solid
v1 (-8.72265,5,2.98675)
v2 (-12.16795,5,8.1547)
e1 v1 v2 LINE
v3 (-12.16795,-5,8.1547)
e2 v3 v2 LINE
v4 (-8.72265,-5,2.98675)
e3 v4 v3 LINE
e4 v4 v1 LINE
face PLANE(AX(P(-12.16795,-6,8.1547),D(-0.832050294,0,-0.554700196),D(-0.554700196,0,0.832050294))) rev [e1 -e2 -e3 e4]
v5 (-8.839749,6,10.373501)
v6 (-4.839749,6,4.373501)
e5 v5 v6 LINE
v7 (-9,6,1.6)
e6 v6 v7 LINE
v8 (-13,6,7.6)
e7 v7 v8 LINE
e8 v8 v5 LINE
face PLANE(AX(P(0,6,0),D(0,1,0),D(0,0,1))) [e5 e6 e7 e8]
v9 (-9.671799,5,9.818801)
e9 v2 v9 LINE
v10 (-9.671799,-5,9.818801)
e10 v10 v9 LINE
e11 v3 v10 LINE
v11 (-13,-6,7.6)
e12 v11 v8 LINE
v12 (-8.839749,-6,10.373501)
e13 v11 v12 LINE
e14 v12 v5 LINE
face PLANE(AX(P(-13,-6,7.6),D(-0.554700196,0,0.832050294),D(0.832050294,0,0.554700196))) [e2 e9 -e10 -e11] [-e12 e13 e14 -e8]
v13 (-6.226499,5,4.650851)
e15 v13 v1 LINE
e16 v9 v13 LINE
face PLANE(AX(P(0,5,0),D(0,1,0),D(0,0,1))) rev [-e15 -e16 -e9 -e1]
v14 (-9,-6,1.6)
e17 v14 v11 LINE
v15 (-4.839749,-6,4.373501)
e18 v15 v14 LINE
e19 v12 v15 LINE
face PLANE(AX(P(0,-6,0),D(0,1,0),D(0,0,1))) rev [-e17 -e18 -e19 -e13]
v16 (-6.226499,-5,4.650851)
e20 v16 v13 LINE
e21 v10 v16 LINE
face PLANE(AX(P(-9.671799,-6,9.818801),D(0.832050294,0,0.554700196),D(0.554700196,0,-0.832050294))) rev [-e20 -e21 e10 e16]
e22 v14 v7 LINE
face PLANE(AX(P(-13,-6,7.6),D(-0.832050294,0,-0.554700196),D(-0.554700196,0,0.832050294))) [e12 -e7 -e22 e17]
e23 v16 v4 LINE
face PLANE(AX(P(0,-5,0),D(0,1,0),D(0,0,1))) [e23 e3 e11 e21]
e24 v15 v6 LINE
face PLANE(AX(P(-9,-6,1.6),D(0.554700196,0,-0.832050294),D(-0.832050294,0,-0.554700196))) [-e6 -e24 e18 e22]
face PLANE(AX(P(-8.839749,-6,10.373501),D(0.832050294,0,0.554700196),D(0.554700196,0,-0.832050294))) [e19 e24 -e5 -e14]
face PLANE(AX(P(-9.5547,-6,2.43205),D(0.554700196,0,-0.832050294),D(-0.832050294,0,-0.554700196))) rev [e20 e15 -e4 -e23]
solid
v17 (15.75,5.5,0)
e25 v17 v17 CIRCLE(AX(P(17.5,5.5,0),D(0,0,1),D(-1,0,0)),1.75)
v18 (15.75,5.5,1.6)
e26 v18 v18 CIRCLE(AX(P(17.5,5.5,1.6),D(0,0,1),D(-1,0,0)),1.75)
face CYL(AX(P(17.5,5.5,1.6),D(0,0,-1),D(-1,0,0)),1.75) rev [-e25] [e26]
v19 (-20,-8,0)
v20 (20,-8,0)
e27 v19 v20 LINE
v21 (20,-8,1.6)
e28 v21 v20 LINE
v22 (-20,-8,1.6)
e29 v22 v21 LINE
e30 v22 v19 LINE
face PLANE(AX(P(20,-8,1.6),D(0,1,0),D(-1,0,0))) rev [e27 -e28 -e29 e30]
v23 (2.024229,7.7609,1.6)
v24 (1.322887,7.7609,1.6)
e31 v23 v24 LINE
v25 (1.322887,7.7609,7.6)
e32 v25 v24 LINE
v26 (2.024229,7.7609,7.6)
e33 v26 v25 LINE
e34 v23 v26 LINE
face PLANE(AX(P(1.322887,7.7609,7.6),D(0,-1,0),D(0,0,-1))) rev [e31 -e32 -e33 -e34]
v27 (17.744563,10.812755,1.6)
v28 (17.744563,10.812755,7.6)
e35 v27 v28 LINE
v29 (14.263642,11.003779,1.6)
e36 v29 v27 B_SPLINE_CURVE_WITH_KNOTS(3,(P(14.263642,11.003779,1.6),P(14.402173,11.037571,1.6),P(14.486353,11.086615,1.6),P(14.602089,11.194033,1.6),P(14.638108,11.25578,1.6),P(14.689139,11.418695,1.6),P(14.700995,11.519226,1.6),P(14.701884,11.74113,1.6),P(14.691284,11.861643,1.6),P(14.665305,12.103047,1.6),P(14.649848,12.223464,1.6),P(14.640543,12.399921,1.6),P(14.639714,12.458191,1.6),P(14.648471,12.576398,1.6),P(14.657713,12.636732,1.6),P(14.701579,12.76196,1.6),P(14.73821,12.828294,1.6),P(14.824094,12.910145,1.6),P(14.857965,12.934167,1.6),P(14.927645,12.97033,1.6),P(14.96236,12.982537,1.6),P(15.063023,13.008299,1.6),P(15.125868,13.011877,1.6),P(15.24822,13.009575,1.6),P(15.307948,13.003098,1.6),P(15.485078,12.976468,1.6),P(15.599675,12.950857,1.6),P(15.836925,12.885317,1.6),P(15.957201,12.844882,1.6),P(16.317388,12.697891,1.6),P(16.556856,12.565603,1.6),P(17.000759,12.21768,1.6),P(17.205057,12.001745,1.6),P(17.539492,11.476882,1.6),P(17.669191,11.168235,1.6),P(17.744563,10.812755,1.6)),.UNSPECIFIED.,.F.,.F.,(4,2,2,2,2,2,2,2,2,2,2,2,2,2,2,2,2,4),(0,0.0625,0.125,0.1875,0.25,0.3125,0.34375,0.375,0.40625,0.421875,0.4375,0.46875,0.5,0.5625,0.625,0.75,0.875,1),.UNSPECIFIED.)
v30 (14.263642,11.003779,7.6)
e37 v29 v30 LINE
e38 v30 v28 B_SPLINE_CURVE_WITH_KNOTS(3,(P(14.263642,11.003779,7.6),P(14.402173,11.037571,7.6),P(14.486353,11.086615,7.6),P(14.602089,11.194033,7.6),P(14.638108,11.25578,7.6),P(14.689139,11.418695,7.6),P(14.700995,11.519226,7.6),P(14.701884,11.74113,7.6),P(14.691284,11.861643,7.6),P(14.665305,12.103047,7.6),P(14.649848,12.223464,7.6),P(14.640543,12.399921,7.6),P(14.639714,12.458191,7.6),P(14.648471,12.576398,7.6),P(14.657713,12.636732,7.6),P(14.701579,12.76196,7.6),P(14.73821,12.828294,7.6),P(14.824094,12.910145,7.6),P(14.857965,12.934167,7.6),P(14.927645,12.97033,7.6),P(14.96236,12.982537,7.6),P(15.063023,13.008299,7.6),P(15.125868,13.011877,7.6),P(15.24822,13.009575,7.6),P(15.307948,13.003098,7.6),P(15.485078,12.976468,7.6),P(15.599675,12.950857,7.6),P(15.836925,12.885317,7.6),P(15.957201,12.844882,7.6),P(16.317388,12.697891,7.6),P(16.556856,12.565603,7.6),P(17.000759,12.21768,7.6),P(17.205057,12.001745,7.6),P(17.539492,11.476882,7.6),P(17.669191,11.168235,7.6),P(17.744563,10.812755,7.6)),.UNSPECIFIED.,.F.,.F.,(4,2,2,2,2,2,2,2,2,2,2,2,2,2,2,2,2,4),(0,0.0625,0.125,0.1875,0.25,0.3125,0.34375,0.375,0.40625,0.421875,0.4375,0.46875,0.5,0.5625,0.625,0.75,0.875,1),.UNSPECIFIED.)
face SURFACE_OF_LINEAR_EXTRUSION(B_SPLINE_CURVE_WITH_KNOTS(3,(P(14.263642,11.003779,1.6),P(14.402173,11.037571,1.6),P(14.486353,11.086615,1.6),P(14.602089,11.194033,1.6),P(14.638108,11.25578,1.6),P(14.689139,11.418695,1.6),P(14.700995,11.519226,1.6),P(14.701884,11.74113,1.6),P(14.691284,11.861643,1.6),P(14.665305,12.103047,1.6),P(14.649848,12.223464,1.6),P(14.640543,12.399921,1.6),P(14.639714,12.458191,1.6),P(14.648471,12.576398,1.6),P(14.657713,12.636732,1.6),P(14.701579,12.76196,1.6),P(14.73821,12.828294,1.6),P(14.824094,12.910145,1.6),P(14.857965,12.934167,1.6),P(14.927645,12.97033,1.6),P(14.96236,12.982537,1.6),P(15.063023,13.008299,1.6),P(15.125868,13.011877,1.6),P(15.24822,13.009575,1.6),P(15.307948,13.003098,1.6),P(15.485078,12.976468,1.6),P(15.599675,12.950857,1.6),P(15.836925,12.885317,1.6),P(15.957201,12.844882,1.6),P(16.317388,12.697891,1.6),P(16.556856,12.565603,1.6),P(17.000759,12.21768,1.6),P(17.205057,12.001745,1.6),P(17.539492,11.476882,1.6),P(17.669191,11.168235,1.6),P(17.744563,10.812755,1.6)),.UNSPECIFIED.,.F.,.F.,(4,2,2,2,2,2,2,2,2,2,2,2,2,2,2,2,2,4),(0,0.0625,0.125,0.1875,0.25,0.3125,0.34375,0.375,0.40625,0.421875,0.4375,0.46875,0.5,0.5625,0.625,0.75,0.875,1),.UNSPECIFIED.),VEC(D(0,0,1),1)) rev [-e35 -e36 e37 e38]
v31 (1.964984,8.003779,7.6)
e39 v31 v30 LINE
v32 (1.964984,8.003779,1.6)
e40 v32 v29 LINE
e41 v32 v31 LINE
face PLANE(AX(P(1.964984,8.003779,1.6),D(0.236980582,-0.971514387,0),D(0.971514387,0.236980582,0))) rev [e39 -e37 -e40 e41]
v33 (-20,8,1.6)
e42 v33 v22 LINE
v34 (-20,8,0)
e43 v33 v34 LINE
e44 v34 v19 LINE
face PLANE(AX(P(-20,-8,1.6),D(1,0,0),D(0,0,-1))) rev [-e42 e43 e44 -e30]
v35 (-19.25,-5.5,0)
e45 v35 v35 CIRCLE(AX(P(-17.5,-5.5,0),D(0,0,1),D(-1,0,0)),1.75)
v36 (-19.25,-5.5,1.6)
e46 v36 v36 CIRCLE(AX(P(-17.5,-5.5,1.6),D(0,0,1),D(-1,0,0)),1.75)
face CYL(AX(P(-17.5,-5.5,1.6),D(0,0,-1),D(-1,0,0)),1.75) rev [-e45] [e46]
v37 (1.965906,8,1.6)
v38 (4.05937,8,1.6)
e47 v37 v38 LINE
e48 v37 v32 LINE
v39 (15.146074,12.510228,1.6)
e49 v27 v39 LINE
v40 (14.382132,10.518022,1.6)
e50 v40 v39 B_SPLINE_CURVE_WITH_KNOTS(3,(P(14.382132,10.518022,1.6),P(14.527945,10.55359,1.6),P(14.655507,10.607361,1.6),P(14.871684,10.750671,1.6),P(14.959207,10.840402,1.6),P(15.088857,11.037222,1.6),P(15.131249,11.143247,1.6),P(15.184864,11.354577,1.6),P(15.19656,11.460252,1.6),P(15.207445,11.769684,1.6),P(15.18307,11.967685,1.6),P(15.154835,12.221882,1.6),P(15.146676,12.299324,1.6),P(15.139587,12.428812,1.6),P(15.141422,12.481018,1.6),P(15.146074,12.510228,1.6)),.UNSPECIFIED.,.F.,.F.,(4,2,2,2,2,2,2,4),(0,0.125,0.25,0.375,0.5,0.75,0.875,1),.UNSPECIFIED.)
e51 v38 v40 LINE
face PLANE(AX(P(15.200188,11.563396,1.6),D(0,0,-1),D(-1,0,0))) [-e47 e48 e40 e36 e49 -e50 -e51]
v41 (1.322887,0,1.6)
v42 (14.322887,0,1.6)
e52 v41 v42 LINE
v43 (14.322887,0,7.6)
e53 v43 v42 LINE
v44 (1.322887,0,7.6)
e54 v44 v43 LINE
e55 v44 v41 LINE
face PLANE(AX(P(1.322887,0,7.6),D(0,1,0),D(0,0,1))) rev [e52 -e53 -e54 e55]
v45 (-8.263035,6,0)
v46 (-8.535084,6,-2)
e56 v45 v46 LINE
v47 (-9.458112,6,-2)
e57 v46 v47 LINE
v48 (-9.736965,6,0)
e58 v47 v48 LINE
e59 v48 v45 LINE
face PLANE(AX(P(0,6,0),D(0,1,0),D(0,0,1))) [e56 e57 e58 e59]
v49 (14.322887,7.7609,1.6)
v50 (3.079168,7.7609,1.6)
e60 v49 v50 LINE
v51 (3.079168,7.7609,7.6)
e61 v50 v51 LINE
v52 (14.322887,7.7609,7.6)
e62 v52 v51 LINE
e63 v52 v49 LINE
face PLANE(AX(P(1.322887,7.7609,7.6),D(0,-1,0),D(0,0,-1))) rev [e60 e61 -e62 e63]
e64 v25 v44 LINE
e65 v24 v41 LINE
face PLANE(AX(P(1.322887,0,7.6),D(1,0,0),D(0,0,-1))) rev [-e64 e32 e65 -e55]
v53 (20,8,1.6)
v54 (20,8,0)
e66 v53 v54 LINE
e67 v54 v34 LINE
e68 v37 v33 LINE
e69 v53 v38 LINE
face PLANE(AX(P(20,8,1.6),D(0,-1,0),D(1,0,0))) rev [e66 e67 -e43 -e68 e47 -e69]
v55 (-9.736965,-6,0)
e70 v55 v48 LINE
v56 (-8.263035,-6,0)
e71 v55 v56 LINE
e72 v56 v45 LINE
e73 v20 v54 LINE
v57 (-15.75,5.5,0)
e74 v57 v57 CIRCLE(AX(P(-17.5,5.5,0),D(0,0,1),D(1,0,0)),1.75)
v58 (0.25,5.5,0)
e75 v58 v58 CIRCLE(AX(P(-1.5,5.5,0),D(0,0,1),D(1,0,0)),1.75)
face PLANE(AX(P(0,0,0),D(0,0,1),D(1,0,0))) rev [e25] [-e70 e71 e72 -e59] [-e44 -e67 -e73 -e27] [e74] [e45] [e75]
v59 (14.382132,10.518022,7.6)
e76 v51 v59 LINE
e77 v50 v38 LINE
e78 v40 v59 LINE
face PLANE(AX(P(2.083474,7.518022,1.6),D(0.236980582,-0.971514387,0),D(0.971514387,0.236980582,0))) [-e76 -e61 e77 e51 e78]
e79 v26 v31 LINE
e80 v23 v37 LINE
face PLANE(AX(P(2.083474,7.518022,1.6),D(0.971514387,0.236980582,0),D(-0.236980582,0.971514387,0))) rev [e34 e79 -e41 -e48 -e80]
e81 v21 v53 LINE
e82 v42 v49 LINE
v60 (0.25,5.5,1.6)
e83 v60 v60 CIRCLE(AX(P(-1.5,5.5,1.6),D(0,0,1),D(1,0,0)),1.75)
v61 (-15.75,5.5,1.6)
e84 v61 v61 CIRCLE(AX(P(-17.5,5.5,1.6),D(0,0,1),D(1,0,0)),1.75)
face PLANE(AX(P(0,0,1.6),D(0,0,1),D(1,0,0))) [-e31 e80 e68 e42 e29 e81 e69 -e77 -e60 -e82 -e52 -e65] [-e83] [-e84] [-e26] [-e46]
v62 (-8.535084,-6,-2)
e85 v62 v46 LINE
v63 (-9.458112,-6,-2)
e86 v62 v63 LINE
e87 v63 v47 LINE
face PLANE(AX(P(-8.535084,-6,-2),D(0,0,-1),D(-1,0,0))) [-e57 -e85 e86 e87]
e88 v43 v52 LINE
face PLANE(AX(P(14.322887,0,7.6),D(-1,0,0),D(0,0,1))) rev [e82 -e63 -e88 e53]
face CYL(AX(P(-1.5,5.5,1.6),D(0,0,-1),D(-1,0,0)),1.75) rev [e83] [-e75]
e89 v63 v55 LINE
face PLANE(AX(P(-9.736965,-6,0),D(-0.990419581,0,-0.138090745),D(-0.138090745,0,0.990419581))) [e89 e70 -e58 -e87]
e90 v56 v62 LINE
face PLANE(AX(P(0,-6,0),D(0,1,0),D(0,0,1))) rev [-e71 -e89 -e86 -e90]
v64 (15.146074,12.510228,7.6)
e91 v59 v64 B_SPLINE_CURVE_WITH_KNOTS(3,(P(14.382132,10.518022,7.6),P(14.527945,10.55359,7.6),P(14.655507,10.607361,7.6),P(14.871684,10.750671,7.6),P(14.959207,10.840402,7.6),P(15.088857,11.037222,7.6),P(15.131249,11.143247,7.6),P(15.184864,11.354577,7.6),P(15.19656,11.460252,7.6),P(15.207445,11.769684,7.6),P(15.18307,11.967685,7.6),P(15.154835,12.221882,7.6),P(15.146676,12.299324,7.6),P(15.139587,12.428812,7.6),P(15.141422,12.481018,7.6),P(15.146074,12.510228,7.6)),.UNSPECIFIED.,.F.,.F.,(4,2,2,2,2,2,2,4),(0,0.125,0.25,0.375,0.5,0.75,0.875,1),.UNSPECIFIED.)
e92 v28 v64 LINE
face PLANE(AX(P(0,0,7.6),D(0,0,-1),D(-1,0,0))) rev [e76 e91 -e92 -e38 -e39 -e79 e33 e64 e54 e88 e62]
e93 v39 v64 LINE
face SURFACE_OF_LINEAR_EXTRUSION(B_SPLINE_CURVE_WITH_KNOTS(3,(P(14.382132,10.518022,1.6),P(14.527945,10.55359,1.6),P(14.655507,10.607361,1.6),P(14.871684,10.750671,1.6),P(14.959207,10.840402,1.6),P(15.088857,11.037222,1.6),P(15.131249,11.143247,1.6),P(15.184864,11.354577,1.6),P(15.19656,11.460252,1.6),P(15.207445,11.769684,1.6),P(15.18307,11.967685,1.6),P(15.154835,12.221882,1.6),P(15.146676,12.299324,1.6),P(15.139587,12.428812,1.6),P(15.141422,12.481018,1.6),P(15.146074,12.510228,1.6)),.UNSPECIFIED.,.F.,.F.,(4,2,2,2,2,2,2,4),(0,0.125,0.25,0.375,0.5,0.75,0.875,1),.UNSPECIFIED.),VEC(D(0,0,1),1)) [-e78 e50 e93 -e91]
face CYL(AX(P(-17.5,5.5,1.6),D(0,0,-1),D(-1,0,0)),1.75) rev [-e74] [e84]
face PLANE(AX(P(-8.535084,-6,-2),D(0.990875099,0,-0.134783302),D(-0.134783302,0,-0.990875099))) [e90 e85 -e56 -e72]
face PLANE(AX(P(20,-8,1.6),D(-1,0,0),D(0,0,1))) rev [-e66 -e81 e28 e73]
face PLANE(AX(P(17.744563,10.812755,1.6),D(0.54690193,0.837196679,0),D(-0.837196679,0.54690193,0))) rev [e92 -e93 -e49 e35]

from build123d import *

# Parameters (mm, degrees)
SKETCH1_W           = 40
SKETCH1_H           = 16
SKETCH1_R           = 1.75
EXTRUDE1_DEPTH      = 1.6
SKETCH2_W           = 13
SKETCH2_H           = 7.760900167
EXTRUDE2_DEPTH      = 6
EXTRUDE_THIN1_START = -6
EXTRUDE_THIN1_DEPTH = 6
EXTRUDE3_DEPTH      = 6
EXTRUDE3_DEPTH_BACK = 6
SHELL1_T            = -1
EXTRUDE4_DEPTH      = 6
EXTRUDE4_DEPTH_BACK = 6


# Read off the part's stored shape, not the designer's step: Extrude-Thin1
with BuildPart() as part:
    # Sketch1 → Extrude1 (new body)
    with BuildSketch(Plane.XY):
        Rectangle(SKETCH1_W, SKETCH1_H)
        with Locations((-17.5, 5.5)):
            Circle(SKETCH1_R, mode=Mode.SUBTRACT)
        with Locations(Location((17.5, 5.5, 0), (0, 0, 180))):
            Circle(SKETCH1_R, mode=Mode.SUBTRACT)
        with Locations(Location((-17.5, -5.5, 0), (0, 0, 180))):
            Circle(SKETCH1_R, mode=Mode.SUBTRACT)
        with Locations((-1.5, 5.5)):
            Circle(SKETCH1_R, mode=Mode.SUBTRACT)
    extrude(amount=EXTRUDE1_DEPTH)

    # Sketch2 → Extrude2 (add)
    with BuildSketch(Plane.XY.offset(1.6)):
        with Locations((7.822887278, 3.880450084)):
            Rectangle(SKETCH2_W, SKETCH2_H)
    extrude(amount=EXTRUDE2_DEPTH)

    # Extrude-Thin1 outline → Extrude-Thin1 (add)
    with BuildSketch(Plane.XY.offset(7.6).offset(EXTRUDE_THIN1_START)):
        with BuildLine():
            Line((3.079167928, 7.760900167), (14.382132424, 10.51802157))
            add(Edge.make_bspline(
                [(14.382132424, 10.51802157), (14.527945212, 10.553589545), (14.655507009, 10.60736065), (14.871684027, 10.750671126), (14.959206507, 10.840402341), (15.088857099, 11.037222478), (15.131248766, 11.143247489), (15.184864162, 11.354576745), (15.196559854, 11.46025225), (15.207444647, 11.769684033), (15.183069736, 11.967685168), (15.154835021, 12.22188203), (15.146676484, 12.299323613), (15.139586524, 12.42881224), (15.141421953, 12.481018205), (15.14607356, 12.510227856)],
                knots=[0, 0, 0, 0, 0.125, 0.125, 0.25, 0.25, 0.375, 0.375, 0.5, 0.5, 0.75, 0.75, 0.875, 0.875, 1, 1, 1, 1], degree=3))
            Line((15.14607356, 12.510227856), (17.744563111, 10.812754625))
            add(Edge.make_bspline(
                [(14.263642133, 11.003778764), (14.402173401, 11.037570564), (14.486352869, 11.086615299), (14.60208936, 11.194032624), (14.638108268, 11.255779889), (14.689139196, 11.41869456), (14.700995458, 11.519225736), (14.701883987, 11.741129862), (14.691284391, 11.861642827), (14.665305455, 12.103047364), (14.649847616, 12.223464026), (14.64054286, 12.399920995), (14.639713982, 12.458191462), (14.64847118, 12.576397683), (14.657712888, 12.636731658), (14.701579266, 12.761960135), (14.738209693, 12.82829366), (14.824093983, 12.910144757), (14.857964765, 12.934167296), (14.927645174, 12.970329572), (14.962359684, 12.982536879), (15.06302261, 13.00829889), (15.125868218, 13.011876971), (15.248220417, 13.009575456), (15.30794798, 13.003097855), (15.485077928, 12.976467745), (15.599675402, 12.950856525), (15.836925446, 12.885317177), (15.957201353, 12.844881865), (16.31738791, 12.697890775), (16.556855556, 12.565603074), (17.000758871, 12.217680393), (17.205056858, 12.001744635), (17.539491556, 11.47688197), (17.669190892, 11.168235428), (17.744563111, 10.812754625)],
                knots=[0, 0, 0, 0, 0.0625, 0.0625, 0.125, 0.125, 0.1875, 0.1875, 0.25, 0.25, 0.3125, 0.3125, 0.34375, 0.34375, 0.375, 0.375, 0.40625, 0.40625, 0.421875, 0.421875, 0.4375, 0.4375, 0.46875, 0.46875, 0.5, 0.5, 0.5625, 0.5625, 0.625, 0.625, 0.75, 0.75, 0.875, 0.875, 1, 1, 1, 1], degree=3))
            Line((14.263642133, 11.003778764), (1.96498403, 8.003778764))
            Line((1.96498403, 8.003778764), (2.024229176, 7.760900167))
            Line((2.024229176, 7.760900167), (3.079167928, 7.760900167))
        make_face()
    extrude(amount=EXTRUDE_THIN1_DEPTH)

    # Sketch5 → Extrude4 (add, two sides: drawn at the far end of the back side and taken through both)
    with BuildSketch(Plane(origin=(0, 0, 0), x_dir=(1, 0, 0), z_dir=(0, 1, 0)).offset(-EXTRUDE4_DEPTH_BACK)):
        Polygon((-9.736964899, 0), (-9.458111879, 2), (-8.535084126, 2), (-8.263035101, 0), align=None)
    extrude(amount=EXTRUDE4_DEPTH + EXTRUDE4_DEPTH_BACK)


with BuildPart() as body_2:
    # Sketch4 → Extrude3 (new, two sides: drawn at the far end of the back side and taken through both)
    with BuildSketch(Plane(origin=(0, 0, 0), x_dir=(1, 0, 0), z_dir=(0, 1, 0)).offset(-EXTRUDE3_DEPTH_BACK)):
        Polygon((-13, -7.6), (-9, -1.6), (-4.839748528, -4.373500981), (-8.839748528, -10.373500981), align=None)
    extrude(amount=EXTRUDE3_DEPTH + EXTRUDE3_DEPTH_BACK)

    # Shell1
    shell1_openings = [body_2.faces().sort_by_distance(p)[0] for p in [
        (-10.919874264, 0, 8.986750491),
    ]]
    offset(amount=SHELL1_T, openings=shell1_openings, kind=Kind.INTERSECTION)


solid = Compound([part.part, body_2.part])
